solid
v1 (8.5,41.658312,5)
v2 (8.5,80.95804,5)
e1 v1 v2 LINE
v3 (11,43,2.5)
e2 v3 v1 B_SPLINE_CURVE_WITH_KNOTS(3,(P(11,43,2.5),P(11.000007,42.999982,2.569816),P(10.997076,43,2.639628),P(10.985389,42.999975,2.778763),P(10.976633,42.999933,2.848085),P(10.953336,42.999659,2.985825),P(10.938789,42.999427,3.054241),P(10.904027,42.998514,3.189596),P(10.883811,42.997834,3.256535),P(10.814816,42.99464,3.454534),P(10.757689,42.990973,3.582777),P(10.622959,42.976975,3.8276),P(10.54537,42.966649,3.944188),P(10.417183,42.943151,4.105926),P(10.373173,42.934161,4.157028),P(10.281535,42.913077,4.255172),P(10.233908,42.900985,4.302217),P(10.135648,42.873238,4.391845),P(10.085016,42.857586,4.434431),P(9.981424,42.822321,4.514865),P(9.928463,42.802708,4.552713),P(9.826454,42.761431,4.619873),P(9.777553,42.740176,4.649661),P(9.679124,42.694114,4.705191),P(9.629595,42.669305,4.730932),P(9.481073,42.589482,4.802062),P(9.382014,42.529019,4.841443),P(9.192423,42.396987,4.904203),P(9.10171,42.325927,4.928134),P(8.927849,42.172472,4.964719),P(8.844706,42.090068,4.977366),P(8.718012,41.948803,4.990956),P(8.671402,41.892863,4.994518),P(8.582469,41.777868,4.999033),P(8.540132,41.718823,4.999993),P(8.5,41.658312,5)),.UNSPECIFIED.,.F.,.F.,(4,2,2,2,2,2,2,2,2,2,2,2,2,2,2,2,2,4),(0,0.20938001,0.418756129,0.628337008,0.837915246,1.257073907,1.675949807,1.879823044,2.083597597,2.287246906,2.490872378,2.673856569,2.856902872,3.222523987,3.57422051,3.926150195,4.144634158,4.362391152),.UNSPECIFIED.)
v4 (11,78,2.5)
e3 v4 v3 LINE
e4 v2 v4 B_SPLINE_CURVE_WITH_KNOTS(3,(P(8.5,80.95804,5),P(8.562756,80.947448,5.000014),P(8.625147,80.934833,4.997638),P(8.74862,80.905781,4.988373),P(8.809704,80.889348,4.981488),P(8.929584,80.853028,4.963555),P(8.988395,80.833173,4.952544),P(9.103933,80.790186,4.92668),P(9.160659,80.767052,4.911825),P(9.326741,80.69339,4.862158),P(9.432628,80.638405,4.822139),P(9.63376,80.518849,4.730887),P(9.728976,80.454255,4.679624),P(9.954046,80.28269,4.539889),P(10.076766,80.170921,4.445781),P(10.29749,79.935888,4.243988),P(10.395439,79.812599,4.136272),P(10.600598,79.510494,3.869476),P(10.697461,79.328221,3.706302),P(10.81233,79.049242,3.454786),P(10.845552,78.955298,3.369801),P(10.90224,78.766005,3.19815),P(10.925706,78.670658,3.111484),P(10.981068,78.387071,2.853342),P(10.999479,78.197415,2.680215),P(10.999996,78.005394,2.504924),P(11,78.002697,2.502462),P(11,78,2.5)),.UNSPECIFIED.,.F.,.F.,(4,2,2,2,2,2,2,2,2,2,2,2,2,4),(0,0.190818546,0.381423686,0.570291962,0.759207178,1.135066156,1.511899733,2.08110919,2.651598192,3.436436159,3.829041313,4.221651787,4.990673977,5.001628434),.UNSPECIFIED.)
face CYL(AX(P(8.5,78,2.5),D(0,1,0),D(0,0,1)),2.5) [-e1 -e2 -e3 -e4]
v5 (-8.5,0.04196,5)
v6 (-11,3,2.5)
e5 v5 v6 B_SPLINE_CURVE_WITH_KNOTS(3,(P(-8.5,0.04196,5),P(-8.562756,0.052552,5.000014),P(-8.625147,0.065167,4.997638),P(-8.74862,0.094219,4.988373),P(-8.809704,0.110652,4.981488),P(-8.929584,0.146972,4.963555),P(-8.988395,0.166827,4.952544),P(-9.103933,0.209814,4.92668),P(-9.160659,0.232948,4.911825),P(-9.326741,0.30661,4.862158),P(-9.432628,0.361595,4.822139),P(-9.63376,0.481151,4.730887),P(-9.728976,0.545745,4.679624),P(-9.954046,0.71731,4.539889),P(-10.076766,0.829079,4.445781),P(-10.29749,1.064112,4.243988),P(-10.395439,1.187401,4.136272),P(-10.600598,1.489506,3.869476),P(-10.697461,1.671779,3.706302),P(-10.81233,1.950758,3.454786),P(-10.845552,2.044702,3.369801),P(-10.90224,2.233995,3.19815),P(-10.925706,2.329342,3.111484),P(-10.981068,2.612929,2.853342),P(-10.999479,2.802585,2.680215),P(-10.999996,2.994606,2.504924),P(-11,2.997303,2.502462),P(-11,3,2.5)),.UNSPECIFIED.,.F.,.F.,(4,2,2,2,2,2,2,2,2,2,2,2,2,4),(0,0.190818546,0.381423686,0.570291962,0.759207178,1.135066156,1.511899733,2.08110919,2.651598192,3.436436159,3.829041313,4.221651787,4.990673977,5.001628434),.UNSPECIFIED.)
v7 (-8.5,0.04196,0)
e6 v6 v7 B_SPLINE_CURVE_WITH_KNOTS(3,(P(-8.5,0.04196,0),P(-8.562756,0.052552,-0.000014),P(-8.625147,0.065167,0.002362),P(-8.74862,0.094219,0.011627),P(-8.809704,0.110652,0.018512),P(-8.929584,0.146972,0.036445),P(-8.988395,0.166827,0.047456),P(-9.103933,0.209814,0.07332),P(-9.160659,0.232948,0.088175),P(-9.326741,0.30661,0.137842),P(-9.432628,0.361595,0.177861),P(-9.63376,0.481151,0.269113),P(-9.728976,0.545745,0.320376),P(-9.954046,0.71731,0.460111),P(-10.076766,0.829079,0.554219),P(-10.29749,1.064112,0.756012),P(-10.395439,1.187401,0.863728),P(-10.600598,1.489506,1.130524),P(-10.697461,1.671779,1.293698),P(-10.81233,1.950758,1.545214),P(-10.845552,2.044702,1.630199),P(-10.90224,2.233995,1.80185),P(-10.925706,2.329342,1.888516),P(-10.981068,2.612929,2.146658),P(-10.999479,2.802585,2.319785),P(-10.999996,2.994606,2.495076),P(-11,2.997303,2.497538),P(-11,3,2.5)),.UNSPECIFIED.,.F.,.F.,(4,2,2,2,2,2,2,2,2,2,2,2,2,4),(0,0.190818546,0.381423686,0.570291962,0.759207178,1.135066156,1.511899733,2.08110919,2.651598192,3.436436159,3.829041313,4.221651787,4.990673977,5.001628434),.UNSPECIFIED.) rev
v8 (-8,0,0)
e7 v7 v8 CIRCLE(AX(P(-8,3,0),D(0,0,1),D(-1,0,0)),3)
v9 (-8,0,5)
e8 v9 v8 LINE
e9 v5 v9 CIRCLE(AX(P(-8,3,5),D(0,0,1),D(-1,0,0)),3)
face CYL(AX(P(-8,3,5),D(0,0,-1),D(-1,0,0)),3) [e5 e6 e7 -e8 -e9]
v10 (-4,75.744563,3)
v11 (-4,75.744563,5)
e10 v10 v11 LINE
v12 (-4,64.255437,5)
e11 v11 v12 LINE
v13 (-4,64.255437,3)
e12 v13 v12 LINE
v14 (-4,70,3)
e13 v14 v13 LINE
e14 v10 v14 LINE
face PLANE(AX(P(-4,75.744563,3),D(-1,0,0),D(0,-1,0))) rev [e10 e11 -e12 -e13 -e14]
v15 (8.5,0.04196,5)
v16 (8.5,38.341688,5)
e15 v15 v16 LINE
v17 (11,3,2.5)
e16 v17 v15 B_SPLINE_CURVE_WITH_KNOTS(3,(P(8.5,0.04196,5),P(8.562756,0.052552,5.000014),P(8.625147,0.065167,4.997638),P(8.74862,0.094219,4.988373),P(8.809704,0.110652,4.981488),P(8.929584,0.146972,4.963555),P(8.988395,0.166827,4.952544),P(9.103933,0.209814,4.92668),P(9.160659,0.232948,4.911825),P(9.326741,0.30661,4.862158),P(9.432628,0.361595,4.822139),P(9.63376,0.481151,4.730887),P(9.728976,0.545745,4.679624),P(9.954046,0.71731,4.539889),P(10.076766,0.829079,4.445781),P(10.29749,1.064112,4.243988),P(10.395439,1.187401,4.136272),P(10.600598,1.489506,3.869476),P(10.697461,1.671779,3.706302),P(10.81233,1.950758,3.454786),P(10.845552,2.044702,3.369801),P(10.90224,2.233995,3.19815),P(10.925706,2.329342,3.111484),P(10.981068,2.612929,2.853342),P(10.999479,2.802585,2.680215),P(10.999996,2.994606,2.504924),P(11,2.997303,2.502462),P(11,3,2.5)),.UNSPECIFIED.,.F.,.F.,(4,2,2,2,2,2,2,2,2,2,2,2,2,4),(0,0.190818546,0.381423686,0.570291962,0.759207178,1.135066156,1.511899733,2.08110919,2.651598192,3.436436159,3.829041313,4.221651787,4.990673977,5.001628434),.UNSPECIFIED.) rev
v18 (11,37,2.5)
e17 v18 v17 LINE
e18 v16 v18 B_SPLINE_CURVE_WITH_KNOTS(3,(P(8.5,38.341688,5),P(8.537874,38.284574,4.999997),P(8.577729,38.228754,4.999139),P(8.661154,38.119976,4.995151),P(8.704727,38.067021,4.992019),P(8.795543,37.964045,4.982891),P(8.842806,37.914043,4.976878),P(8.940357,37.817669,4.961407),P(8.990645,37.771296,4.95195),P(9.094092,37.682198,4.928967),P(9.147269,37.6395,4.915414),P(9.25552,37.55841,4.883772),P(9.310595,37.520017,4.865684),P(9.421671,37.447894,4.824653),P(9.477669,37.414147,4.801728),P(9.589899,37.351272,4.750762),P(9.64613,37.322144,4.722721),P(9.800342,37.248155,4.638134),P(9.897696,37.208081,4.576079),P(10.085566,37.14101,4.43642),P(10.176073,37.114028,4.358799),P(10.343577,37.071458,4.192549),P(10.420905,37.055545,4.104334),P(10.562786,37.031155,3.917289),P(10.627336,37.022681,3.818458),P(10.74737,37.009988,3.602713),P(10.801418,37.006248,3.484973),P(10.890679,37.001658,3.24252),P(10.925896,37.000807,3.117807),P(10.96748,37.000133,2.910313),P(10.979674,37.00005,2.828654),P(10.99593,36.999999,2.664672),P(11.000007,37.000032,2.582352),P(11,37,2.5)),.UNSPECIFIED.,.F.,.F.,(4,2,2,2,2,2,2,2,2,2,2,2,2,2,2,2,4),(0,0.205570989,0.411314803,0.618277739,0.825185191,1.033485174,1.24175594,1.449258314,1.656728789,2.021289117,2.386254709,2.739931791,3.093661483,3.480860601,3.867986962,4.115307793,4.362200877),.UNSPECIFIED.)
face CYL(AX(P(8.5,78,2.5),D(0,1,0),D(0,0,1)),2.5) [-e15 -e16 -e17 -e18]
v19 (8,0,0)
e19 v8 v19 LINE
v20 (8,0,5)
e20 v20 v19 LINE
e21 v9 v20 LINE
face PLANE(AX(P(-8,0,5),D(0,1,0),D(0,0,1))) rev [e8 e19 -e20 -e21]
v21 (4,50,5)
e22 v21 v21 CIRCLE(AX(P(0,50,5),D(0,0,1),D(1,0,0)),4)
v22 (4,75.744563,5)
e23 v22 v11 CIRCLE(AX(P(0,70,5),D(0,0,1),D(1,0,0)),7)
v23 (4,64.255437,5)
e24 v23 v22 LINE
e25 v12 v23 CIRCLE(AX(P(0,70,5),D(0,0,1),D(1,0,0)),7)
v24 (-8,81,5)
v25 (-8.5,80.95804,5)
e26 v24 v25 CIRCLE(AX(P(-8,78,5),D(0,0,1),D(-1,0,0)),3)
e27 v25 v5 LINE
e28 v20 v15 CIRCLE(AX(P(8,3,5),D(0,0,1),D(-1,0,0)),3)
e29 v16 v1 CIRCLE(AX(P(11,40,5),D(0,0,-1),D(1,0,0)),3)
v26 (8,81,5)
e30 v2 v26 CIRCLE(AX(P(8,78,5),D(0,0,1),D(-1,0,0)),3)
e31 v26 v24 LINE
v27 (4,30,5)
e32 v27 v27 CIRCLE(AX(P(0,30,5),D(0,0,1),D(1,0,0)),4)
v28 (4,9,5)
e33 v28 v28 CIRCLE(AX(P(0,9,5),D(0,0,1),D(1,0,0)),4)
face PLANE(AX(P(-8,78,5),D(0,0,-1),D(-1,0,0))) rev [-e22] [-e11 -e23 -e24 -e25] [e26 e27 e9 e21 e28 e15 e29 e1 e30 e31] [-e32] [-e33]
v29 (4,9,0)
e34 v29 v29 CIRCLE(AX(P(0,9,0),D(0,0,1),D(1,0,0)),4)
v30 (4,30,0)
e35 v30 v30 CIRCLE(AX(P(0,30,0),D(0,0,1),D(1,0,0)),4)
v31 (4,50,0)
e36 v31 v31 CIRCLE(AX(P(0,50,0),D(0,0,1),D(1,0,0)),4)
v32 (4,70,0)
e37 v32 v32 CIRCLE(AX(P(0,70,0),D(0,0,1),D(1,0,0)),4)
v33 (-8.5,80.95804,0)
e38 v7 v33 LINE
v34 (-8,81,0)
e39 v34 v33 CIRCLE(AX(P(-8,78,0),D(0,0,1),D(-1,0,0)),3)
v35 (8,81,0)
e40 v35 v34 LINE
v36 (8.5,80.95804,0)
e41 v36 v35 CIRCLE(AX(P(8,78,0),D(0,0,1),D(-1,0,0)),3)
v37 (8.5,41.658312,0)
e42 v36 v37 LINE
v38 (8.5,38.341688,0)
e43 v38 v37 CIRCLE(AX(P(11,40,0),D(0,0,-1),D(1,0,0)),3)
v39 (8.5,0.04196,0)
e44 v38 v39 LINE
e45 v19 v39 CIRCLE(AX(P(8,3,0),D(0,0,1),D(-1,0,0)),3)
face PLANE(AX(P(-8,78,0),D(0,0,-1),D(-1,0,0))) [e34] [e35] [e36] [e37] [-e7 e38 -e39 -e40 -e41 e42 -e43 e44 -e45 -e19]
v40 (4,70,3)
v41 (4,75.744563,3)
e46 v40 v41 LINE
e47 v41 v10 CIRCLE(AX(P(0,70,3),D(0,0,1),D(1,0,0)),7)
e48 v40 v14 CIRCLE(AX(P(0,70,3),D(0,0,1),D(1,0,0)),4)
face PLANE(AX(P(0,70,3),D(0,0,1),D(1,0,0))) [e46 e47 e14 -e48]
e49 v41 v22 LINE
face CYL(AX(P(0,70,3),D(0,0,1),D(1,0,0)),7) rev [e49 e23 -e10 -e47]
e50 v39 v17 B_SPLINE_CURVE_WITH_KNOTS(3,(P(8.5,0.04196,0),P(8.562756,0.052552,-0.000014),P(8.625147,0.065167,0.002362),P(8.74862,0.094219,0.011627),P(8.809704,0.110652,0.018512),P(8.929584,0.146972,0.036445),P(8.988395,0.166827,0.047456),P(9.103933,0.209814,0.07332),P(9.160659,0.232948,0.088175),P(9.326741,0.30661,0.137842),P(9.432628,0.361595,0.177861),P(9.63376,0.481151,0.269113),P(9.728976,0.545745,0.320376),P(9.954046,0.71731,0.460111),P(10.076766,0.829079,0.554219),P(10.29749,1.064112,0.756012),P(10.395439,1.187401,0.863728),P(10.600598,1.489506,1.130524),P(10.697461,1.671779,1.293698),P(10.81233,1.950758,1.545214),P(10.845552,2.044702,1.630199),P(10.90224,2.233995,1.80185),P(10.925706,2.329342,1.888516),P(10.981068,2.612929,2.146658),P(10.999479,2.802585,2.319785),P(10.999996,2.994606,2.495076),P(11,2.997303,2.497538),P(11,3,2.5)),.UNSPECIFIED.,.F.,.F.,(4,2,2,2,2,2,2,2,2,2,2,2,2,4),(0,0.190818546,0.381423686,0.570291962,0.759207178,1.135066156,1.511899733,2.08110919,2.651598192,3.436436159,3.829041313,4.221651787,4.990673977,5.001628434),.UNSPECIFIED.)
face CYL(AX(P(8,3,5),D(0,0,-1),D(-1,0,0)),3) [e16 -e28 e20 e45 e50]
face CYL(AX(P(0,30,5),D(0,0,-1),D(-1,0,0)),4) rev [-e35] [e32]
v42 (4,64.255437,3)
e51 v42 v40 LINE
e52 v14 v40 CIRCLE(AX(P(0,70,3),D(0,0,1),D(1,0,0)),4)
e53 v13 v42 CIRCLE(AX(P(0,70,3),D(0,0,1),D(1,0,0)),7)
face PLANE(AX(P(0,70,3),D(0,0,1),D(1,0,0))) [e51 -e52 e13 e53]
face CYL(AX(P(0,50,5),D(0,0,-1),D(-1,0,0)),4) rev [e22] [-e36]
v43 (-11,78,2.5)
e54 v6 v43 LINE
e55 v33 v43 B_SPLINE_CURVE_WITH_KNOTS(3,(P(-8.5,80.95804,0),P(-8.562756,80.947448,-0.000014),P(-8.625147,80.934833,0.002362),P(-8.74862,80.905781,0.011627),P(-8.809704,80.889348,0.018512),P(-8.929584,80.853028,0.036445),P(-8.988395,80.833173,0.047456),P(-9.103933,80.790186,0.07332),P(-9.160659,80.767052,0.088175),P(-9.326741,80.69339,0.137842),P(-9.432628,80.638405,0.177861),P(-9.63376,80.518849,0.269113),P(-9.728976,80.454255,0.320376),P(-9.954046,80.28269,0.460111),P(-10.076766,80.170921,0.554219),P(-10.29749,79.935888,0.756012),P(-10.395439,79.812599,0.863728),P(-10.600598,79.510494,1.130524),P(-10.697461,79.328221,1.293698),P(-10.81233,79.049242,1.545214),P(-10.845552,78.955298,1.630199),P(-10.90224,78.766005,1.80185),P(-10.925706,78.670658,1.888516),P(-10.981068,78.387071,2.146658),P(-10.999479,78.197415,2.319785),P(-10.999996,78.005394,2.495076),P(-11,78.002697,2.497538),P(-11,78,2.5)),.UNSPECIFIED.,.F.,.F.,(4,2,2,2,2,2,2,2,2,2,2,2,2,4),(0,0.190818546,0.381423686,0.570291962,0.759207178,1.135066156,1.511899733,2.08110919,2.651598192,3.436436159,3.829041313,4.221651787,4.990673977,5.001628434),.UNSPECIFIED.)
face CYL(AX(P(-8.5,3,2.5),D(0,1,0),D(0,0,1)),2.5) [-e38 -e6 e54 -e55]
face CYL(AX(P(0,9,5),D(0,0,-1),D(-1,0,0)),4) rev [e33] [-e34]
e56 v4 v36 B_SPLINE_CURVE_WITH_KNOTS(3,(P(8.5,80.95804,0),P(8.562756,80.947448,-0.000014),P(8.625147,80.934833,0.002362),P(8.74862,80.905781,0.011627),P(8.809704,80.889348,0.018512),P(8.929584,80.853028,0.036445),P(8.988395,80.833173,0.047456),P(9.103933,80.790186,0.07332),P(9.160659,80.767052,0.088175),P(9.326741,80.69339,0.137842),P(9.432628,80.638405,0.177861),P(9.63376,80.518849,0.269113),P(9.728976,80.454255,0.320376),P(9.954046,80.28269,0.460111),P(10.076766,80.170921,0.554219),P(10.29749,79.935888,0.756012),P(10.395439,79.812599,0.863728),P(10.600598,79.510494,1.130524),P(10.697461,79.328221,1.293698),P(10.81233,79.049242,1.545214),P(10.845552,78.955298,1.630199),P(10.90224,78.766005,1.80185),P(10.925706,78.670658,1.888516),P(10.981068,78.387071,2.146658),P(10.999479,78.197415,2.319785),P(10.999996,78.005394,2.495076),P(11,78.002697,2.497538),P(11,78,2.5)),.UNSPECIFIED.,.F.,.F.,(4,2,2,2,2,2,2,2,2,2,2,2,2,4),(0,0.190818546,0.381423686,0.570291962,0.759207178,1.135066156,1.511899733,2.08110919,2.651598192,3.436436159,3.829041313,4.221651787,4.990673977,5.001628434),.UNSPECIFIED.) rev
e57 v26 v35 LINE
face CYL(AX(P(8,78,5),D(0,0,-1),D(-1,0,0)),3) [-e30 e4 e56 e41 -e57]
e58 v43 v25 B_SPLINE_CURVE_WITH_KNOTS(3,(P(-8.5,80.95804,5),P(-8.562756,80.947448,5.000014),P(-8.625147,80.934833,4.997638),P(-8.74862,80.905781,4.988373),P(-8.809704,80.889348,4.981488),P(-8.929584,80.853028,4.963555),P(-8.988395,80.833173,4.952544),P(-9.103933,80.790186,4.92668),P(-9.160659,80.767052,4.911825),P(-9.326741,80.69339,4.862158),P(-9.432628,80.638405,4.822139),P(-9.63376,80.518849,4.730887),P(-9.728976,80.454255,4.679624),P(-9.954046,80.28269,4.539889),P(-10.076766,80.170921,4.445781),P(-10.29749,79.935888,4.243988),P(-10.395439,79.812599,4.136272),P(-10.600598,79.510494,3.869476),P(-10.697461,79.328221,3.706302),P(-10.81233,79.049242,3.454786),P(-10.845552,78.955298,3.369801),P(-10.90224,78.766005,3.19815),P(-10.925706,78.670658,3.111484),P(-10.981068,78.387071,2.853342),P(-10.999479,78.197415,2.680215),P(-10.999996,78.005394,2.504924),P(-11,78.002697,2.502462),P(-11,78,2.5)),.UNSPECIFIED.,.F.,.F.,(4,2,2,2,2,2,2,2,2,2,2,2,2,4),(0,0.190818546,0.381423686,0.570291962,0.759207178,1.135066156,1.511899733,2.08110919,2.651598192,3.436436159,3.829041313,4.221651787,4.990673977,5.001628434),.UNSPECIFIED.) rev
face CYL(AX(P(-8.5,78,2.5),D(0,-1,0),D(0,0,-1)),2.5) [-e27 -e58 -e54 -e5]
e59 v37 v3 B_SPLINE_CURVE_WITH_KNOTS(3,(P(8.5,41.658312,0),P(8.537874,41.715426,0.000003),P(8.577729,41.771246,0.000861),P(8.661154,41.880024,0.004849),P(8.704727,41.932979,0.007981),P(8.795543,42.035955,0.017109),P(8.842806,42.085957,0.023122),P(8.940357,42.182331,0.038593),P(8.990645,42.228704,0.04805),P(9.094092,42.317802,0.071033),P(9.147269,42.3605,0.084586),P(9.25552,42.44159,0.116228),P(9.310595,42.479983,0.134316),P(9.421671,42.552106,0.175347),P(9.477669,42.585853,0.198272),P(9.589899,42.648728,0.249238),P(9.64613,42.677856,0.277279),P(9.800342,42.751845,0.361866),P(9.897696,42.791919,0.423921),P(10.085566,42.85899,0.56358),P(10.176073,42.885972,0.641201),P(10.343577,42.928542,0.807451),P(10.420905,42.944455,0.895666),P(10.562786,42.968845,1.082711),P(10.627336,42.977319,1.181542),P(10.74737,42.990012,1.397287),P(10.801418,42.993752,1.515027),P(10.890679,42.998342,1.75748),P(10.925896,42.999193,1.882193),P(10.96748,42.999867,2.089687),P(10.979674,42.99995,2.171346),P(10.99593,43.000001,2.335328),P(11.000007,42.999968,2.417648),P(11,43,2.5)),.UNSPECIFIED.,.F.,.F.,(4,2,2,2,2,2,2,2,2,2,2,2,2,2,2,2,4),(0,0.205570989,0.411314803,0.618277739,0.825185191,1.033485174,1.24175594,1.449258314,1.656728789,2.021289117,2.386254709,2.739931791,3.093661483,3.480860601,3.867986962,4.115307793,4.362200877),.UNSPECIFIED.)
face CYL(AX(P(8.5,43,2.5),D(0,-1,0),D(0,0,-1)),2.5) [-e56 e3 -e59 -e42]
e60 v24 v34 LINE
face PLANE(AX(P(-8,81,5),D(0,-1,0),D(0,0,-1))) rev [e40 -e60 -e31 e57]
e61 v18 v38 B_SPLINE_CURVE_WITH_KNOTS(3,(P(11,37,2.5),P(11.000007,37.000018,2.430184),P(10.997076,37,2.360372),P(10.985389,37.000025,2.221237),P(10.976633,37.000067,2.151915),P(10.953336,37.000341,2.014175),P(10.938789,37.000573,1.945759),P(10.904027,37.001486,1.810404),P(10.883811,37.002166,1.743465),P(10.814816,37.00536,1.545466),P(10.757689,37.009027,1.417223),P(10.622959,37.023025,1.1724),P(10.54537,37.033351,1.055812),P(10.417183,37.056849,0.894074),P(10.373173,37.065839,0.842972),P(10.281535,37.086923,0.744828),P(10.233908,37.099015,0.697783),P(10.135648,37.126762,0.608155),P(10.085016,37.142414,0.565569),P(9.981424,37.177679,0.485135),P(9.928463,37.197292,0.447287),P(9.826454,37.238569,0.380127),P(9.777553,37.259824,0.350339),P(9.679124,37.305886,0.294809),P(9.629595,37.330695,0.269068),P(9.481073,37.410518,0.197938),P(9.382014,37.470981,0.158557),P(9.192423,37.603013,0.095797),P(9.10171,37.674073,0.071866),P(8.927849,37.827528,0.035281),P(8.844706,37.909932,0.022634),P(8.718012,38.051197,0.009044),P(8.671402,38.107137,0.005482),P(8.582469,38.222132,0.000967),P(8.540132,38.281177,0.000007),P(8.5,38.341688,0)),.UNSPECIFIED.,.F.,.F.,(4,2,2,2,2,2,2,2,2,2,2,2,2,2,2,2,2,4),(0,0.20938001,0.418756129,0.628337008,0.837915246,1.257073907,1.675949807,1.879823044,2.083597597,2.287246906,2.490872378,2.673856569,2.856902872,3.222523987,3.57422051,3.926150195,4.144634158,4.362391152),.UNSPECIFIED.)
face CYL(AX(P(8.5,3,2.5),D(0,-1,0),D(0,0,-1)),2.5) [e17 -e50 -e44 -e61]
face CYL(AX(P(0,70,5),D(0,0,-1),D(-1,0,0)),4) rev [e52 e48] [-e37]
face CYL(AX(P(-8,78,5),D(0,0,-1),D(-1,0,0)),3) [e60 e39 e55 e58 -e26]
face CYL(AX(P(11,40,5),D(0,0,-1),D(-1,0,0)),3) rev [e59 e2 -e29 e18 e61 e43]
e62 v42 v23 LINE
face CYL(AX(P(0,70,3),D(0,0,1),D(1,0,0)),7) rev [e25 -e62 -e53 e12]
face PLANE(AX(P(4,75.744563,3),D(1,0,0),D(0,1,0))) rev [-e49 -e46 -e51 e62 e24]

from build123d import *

# Parameters (mm, degrees)
ESQUISSE1_R             = 4
EXTRUSION1_DEPTH        = 5
ENL_V_MAT_EXTRU_1_DEPTH = 2
CONG_1_R                = 2.5


with BuildPart() as part:
    # Esquisse1 → Extrusion1 (new body)
    with BuildSketch(Plane.XY):
        with BuildLine():
            Line((-8, 0), (8, 0))
            ThreePointArc((8, 0), (10.121320344, 0.878679656), (11, 3))
            Line((11, 3), (11, 37))
            ThreePointArc((11, 37), (8, 40), (11, 43))
            Line((11, 43), (11, 78))
            ThreePointArc((11, 78), (10.121320344, 80.121320344), (8, 81))
            Line((8, 81), (-8, 81))
            ThreePointArc((-8, 81), (-10.121320344, 80.121320344), (-11, 78))
            Line((-11, 78), (-11, 3))
            ThreePointArc((-11, 3), (-10.121320344, 0.878679656), (-8, 0))
        make_face()
        with Locations((0, 9)):
            Circle(ESQUISSE1_R, mode=Mode.SUBTRACT)
        with Locations((0, 30)):
            Circle(ESQUISSE1_R, mode=Mode.SUBTRACT)
        with Locations((0, 50)):
            Circle(ESQUISSE1_R, mode=Mode.SUBTRACT)
        with Locations((0, 70)):
            Circle(ESQUISSE1_R, mode=Mode.SUBTRACT)
    extrude(amount=EXTRUSION1_DEPTH)

    # Esquisse2 → Enlèv. mat.-Extru.1 (cut)
    with BuildSketch(Plane.XY.offset(5)):
        with BuildLine():
            Line((4, 75.744562647), (4, 64.255437353))
            ThreePointArc((4, 64.255437353), (0, 63), (-4, 64.255437353))
            Line((-4, 64.255437353), (-4, 75.744562647))
            ThreePointArc((-4, 75.744562647), (0, 77), (4, 75.744562647))
        make_face()
    extrude(amount=-ENL_V_MAT_EXTRU_1_DEPTH, mode=Mode.SUBTRACT)

    # Congé1
    # the kernel refuses this fillet: 2.5 mm, written as the material it takes off along each edge
    with BuildSketch(Plane(origin=(11, -3.25, 0), x_dir=(0, 0, 1), z_dir=(0, 1, 0)), Plane(origin=(11, -3.25, 5), x_dir=(-1, 0, 0), z_dir=(0, 1, 0))) as cong_1_piece_1:
        with BuildLine():
            CenterArc((CONG_1_R, -CONG_1_R), CONG_1_R, 90, 90)
            Line((0, -CONG_1_R), (0, 0))
            Line((0, 0), (CONG_1_R, 0))
        make_face()
    extrude(amount=46.5, mode=Mode.SUBTRACT)
    with BuildSketch(Plane(origin=(-11, 84.25, 0), x_dir=(0, 0, 1), z_dir=(0, -1, 0))) as cong_1_piece_2:
        with BuildLine():
            CenterArc((CONG_1_R, -CONG_1_R), CONG_1_R, 90, 90)
            Line((0, -CONG_1_R), (0, 0))
            Line((0, 0), (CONG_1_R, 0))
        make_face()
    extrude(amount=87.5, mode=Mode.SUBTRACT)
    with BuildSketch(Plane(origin=(-11, 84.25, 5), x_dir=(0, 0, -1), z_dir=(0, -1, 0))) as cong_1_piece_3:
        with BuildLine():
            CenterArc((CONG_1_R, CONG_1_R), CONG_1_R, 180, 90)
            Line((0, CONG_1_R), (0, 0))
            Line((0, 0), (CONG_1_R, 0))
        make_face()
    extrude(amount=87.5, mode=Mode.SUBTRACT)
    with BuildSketch(Plane(origin=(11, 36.75, 0), x_dir=(0, 0, 1), z_dir=(0, 1, 0)), Plane(origin=(11, 36.75, 5), x_dir=(-1, 0, 0), z_dir=(0, 1, 0))) as cong_1_piece_4:
        with BuildLine():
            CenterArc((CONG_1_R, -CONG_1_R), CONG_1_R, 90, 90)
            Line((0, -CONG_1_R), (0, 0))
            Line((0, 0), (CONG_1_R, 0))
        make_face()
    extrude(amount=47.5, mode=Mode.SUBTRACT)


solid = part.part
